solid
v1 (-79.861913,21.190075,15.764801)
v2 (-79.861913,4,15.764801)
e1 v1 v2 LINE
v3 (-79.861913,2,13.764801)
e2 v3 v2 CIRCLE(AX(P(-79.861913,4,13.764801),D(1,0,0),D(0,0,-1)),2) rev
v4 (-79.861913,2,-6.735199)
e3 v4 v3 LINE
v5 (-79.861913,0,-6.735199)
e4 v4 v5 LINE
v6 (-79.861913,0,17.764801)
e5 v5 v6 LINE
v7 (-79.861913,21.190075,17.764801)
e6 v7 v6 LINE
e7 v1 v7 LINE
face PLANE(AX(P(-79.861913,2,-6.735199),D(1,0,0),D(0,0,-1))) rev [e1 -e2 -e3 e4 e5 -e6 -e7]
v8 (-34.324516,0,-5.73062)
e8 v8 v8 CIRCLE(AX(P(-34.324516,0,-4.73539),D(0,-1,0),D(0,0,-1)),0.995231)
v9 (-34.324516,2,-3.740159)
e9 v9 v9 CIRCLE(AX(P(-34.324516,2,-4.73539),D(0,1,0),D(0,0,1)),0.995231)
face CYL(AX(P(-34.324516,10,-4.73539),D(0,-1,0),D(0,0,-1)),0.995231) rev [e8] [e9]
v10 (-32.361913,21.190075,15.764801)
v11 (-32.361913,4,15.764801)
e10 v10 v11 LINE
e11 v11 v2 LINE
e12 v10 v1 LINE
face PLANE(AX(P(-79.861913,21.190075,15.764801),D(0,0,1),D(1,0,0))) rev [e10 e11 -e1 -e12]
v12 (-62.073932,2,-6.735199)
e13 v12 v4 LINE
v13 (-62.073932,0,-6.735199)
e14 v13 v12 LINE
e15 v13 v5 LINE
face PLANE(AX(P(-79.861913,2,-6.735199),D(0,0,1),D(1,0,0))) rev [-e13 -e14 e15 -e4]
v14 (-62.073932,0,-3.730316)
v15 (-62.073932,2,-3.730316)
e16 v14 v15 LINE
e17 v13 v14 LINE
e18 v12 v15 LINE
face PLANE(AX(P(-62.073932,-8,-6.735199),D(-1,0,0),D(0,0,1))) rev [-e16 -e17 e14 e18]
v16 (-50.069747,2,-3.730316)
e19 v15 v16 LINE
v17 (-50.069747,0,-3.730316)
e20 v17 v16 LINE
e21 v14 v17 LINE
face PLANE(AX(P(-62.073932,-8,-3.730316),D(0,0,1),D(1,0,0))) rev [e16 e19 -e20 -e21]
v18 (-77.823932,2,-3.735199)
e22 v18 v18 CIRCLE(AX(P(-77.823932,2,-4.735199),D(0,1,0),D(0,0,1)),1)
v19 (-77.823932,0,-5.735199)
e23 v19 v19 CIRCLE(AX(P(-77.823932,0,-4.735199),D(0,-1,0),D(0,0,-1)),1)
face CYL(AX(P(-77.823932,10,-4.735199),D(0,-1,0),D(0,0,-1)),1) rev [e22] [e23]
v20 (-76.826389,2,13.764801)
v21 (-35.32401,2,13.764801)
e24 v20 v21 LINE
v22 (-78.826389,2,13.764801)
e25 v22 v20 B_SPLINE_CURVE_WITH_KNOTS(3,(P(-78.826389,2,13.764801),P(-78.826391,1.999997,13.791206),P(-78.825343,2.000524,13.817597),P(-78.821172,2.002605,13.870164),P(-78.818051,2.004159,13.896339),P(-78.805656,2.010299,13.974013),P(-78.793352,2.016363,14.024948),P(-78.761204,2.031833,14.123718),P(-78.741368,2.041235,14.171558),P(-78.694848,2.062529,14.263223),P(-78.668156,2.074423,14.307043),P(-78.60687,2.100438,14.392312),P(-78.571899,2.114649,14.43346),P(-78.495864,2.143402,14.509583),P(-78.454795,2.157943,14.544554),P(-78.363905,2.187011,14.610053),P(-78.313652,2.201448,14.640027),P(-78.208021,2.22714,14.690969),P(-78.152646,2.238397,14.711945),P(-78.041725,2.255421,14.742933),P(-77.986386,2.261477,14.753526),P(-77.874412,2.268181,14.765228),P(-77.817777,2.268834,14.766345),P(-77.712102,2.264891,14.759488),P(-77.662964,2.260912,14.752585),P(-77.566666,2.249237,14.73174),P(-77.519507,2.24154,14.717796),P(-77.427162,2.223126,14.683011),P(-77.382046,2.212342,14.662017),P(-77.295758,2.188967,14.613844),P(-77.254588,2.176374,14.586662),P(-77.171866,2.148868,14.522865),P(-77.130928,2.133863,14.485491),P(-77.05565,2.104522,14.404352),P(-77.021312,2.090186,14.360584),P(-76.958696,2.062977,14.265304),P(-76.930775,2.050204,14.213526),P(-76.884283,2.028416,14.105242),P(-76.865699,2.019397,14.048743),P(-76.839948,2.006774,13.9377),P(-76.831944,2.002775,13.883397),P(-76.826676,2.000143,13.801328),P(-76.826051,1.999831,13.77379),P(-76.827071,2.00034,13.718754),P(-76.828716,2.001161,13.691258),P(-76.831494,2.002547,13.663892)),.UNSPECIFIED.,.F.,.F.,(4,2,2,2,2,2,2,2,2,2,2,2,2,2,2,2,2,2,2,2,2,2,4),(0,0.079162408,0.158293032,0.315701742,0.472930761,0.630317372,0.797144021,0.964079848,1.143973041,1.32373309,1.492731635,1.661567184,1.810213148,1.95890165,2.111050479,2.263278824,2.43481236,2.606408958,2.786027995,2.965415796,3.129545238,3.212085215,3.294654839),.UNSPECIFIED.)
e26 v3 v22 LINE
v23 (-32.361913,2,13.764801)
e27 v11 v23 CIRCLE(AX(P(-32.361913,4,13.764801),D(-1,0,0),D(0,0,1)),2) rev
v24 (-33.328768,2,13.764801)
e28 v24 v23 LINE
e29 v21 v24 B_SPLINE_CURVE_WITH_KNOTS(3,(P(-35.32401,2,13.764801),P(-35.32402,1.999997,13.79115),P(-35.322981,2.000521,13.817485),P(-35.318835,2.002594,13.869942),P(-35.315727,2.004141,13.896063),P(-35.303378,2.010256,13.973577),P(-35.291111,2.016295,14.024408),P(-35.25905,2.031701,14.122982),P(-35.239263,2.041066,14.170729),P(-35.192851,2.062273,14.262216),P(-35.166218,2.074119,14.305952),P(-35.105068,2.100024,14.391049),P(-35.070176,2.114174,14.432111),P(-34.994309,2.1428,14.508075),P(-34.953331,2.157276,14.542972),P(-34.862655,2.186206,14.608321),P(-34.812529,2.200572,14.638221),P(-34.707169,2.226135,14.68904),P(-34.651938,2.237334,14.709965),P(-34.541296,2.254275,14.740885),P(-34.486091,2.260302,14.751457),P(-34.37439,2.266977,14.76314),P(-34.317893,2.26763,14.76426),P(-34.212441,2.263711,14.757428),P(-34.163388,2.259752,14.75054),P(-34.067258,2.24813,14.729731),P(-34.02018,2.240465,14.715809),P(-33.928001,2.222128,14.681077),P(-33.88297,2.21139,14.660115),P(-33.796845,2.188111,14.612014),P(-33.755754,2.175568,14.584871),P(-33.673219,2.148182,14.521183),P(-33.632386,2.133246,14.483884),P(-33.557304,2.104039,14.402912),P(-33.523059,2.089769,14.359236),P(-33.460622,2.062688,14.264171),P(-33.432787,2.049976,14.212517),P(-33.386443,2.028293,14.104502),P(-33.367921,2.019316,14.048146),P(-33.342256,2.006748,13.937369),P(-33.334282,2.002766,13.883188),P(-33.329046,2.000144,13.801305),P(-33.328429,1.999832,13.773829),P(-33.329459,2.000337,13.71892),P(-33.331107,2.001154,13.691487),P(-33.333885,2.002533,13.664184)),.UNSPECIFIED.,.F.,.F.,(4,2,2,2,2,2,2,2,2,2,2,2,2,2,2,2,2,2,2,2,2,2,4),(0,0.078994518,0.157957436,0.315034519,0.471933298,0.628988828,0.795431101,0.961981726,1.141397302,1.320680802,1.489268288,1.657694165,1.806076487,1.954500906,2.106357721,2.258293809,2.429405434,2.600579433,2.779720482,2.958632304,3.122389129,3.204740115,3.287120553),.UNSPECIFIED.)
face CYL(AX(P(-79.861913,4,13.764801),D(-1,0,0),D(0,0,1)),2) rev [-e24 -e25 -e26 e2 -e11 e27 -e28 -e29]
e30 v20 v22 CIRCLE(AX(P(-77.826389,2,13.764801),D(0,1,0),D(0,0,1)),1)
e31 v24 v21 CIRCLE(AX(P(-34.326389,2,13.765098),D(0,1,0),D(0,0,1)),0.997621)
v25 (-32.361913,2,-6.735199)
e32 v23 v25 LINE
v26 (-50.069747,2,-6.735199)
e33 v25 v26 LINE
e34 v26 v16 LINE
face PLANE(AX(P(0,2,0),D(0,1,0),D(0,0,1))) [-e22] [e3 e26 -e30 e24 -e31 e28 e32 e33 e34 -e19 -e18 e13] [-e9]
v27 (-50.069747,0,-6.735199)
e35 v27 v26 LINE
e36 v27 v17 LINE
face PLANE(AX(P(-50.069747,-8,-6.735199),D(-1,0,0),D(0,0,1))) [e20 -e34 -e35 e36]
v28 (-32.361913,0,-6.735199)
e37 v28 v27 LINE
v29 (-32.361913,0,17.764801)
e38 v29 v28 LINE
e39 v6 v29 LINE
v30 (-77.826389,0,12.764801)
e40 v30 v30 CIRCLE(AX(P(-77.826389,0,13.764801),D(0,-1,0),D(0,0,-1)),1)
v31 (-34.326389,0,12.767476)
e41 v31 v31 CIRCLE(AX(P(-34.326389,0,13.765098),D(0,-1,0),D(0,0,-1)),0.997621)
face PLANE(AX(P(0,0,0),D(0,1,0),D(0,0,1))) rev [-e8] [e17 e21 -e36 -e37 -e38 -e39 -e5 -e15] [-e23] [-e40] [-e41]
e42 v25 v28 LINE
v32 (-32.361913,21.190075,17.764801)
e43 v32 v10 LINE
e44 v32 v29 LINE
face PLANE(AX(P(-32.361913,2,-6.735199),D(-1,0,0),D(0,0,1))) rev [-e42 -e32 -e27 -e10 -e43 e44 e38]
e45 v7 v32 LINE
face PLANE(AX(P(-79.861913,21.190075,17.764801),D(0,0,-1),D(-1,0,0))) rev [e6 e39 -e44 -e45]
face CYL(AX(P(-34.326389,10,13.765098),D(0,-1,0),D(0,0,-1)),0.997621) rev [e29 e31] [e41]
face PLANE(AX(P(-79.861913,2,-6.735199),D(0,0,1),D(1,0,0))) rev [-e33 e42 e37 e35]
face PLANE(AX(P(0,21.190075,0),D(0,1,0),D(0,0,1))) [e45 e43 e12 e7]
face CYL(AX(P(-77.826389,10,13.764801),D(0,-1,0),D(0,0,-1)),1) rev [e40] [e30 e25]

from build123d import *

# Parameters (mm, degrees)
SKETCH3_W           = 47.5
SKETCH3_H           = 22.5
BOSS_EXTRUDE1_DEPTH = 2
SKETCH56_R          = 0.99762119
CUT_EXTRUDE1_DEPTH  = 10
SKETCH53_R          = 0.995230863
CUT_EXTRUDE2_DEPTH  = 10
SKETCH52_R          = 1
CUT_EXTRUDE3_DEPTH  = 10
SKETCH57_R          = 1
CUT_EXTRUDE4_DEPTH  = 10
SKETCH74_W          = 12.004185621
SKETCH74_H          = 3.004883548
CUT_EXTRUDE6_DEPTH  = 10
SKETCH79_W          = 47.5
SKETCH79_H          = 2
BOSS_EXTRUDE2_DEPTH = 21.190075336
FILLET6_R           = 2


with BuildPart() as part:
    # Sketch3 → Boss-Extrude1 (new body)
    with BuildSketch(Plane(origin=(0, 0, 0), x_dir=(1, 0, 0), z_dir=(0, 1, 0))):
        with Locations((-56.111912524, -4.514800621)):
            Rectangle(SKETCH3_W, SKETCH3_H)
    extrude(amount=BOSS_EXTRUDE1_DEPTH)

    # Sketch56 → Cut-Extrude1 (cut)
    with BuildSketch(Plane(origin=(0, 0, 0), x_dir=(-1, 0, 0), z_dir=(0, -1, 0))):
        with Locations(Location((34.326389274, -13.765097561, 0), (0, 0, 90))):
            Circle(SKETCH56_R)
    extrude(amount=-CUT_EXTRUDE1_DEPTH, mode=Mode.SUBTRACT)

    # Sketch53 → Cut-Extrude2 (cut)
    with BuildSketch(Plane(origin=(0.004388193, 0, 0), x_dir=(-1, 0, 0), z_dir=(0, -1, 0))):
        with Locations(Location((34.328904029, 4.735389548, 0), (0, 0, 90))):
            Circle(SKETCH53_R)
    extrude(amount=-CUT_EXTRUDE2_DEPTH, mode=Mode.SUBTRACT)

    # Sketch52 → Cut-Extrude3 (cut)
    with BuildSketch(Plane(origin=(0, 0, -0.040736422), x_dir=(1, 0, 0), z_dir=(0, -1, 0))):
        with Locations(Location((-77.82393232, -4.694462956, 0), (0, 0, 270))):
            Circle(SKETCH52_R)
    extrude(amount=-CUT_EXTRUDE3_DEPTH, mode=Mode.SUBTRACT)

    # Sketch57 → Cut-Extrude4 (cut)
    with BuildSketch(Plane.XZ):
        with Locations(Location((-77.826389274, 13.764800621, 0), (0, 0, 270))):
            Circle(SKETCH57_R)
    extrude(amount=-CUT_EXTRUDE4_DEPTH, mode=Mode.SUBTRACT)

    # Sketch74 → Cut-Extrude6 (cut)
    with BuildSketch(Plane(origin=(0, 2, 0), x_dir=(1, 0, 0), z_dir=(0, 1, 0))):
        with Locations((-56.07183951, 5.232757605)):
            Rectangle(SKETCH74_W, SKETCH74_H)
    extrude(amount=-CUT_EXTRUDE6_DEPTH, mode=Mode.SUBTRACT)

    # Sketch79 → Boss-Extrude2 (add)
    with BuildSketch(Plane(origin=(0, 0, 0), x_dir=(1, 0, 0), z_dir=(0, 1, 0))):
        with Locations((-56.111912524, -16.764800621)):
            Rectangle(SKETCH79_W, SKETCH79_H)
    extrude(amount=BOSS_EXTRUDE2_DEPTH)

    # Fillet6
    # the kernel refuses this fillet: 2 mm, written as the material it adds along each edge
    with BuildSketch(Plane(origin=(-32.361912524, 2, 15.764800621), x_dir=(0, 1, 0), z_dir=(-1, 0, 0))) as fillet6_piece_1_section:
        with BuildLine():
            CenterArc((FILLET6_R, FILLET6_R), FILLET6_R, 180, 90)
            Line((0, FILLET6_R), (0, 0))
            Line((0, 0), (FILLET6_R, 0))
        make_face()
    fillet6_piece_1 = extrude(amount=47.5, mode=Mode.PRIVATE)
    fillet6_piece_1 = fillet6_piece_1 - Plane(origin=(-34.326389274, 2.455648449, 13.765097561), x_dir=(0, 0, -1), z_dir=(0, -1, 0)) * Cylinder(0.99762119, 103, mode=Mode.PRIVATE)
    fillet6_piece_1 = fillet6_piece_1 - Plane(origin=(-77.826389274, 2.455648449, 13.764800621), x_dir=(0, 0, -1), z_dir=(0, -1, 0)) * Cylinder(1, 103, mode=Mode.PRIVATE)
    add(fillet6_piece_1)


solid = part.part
